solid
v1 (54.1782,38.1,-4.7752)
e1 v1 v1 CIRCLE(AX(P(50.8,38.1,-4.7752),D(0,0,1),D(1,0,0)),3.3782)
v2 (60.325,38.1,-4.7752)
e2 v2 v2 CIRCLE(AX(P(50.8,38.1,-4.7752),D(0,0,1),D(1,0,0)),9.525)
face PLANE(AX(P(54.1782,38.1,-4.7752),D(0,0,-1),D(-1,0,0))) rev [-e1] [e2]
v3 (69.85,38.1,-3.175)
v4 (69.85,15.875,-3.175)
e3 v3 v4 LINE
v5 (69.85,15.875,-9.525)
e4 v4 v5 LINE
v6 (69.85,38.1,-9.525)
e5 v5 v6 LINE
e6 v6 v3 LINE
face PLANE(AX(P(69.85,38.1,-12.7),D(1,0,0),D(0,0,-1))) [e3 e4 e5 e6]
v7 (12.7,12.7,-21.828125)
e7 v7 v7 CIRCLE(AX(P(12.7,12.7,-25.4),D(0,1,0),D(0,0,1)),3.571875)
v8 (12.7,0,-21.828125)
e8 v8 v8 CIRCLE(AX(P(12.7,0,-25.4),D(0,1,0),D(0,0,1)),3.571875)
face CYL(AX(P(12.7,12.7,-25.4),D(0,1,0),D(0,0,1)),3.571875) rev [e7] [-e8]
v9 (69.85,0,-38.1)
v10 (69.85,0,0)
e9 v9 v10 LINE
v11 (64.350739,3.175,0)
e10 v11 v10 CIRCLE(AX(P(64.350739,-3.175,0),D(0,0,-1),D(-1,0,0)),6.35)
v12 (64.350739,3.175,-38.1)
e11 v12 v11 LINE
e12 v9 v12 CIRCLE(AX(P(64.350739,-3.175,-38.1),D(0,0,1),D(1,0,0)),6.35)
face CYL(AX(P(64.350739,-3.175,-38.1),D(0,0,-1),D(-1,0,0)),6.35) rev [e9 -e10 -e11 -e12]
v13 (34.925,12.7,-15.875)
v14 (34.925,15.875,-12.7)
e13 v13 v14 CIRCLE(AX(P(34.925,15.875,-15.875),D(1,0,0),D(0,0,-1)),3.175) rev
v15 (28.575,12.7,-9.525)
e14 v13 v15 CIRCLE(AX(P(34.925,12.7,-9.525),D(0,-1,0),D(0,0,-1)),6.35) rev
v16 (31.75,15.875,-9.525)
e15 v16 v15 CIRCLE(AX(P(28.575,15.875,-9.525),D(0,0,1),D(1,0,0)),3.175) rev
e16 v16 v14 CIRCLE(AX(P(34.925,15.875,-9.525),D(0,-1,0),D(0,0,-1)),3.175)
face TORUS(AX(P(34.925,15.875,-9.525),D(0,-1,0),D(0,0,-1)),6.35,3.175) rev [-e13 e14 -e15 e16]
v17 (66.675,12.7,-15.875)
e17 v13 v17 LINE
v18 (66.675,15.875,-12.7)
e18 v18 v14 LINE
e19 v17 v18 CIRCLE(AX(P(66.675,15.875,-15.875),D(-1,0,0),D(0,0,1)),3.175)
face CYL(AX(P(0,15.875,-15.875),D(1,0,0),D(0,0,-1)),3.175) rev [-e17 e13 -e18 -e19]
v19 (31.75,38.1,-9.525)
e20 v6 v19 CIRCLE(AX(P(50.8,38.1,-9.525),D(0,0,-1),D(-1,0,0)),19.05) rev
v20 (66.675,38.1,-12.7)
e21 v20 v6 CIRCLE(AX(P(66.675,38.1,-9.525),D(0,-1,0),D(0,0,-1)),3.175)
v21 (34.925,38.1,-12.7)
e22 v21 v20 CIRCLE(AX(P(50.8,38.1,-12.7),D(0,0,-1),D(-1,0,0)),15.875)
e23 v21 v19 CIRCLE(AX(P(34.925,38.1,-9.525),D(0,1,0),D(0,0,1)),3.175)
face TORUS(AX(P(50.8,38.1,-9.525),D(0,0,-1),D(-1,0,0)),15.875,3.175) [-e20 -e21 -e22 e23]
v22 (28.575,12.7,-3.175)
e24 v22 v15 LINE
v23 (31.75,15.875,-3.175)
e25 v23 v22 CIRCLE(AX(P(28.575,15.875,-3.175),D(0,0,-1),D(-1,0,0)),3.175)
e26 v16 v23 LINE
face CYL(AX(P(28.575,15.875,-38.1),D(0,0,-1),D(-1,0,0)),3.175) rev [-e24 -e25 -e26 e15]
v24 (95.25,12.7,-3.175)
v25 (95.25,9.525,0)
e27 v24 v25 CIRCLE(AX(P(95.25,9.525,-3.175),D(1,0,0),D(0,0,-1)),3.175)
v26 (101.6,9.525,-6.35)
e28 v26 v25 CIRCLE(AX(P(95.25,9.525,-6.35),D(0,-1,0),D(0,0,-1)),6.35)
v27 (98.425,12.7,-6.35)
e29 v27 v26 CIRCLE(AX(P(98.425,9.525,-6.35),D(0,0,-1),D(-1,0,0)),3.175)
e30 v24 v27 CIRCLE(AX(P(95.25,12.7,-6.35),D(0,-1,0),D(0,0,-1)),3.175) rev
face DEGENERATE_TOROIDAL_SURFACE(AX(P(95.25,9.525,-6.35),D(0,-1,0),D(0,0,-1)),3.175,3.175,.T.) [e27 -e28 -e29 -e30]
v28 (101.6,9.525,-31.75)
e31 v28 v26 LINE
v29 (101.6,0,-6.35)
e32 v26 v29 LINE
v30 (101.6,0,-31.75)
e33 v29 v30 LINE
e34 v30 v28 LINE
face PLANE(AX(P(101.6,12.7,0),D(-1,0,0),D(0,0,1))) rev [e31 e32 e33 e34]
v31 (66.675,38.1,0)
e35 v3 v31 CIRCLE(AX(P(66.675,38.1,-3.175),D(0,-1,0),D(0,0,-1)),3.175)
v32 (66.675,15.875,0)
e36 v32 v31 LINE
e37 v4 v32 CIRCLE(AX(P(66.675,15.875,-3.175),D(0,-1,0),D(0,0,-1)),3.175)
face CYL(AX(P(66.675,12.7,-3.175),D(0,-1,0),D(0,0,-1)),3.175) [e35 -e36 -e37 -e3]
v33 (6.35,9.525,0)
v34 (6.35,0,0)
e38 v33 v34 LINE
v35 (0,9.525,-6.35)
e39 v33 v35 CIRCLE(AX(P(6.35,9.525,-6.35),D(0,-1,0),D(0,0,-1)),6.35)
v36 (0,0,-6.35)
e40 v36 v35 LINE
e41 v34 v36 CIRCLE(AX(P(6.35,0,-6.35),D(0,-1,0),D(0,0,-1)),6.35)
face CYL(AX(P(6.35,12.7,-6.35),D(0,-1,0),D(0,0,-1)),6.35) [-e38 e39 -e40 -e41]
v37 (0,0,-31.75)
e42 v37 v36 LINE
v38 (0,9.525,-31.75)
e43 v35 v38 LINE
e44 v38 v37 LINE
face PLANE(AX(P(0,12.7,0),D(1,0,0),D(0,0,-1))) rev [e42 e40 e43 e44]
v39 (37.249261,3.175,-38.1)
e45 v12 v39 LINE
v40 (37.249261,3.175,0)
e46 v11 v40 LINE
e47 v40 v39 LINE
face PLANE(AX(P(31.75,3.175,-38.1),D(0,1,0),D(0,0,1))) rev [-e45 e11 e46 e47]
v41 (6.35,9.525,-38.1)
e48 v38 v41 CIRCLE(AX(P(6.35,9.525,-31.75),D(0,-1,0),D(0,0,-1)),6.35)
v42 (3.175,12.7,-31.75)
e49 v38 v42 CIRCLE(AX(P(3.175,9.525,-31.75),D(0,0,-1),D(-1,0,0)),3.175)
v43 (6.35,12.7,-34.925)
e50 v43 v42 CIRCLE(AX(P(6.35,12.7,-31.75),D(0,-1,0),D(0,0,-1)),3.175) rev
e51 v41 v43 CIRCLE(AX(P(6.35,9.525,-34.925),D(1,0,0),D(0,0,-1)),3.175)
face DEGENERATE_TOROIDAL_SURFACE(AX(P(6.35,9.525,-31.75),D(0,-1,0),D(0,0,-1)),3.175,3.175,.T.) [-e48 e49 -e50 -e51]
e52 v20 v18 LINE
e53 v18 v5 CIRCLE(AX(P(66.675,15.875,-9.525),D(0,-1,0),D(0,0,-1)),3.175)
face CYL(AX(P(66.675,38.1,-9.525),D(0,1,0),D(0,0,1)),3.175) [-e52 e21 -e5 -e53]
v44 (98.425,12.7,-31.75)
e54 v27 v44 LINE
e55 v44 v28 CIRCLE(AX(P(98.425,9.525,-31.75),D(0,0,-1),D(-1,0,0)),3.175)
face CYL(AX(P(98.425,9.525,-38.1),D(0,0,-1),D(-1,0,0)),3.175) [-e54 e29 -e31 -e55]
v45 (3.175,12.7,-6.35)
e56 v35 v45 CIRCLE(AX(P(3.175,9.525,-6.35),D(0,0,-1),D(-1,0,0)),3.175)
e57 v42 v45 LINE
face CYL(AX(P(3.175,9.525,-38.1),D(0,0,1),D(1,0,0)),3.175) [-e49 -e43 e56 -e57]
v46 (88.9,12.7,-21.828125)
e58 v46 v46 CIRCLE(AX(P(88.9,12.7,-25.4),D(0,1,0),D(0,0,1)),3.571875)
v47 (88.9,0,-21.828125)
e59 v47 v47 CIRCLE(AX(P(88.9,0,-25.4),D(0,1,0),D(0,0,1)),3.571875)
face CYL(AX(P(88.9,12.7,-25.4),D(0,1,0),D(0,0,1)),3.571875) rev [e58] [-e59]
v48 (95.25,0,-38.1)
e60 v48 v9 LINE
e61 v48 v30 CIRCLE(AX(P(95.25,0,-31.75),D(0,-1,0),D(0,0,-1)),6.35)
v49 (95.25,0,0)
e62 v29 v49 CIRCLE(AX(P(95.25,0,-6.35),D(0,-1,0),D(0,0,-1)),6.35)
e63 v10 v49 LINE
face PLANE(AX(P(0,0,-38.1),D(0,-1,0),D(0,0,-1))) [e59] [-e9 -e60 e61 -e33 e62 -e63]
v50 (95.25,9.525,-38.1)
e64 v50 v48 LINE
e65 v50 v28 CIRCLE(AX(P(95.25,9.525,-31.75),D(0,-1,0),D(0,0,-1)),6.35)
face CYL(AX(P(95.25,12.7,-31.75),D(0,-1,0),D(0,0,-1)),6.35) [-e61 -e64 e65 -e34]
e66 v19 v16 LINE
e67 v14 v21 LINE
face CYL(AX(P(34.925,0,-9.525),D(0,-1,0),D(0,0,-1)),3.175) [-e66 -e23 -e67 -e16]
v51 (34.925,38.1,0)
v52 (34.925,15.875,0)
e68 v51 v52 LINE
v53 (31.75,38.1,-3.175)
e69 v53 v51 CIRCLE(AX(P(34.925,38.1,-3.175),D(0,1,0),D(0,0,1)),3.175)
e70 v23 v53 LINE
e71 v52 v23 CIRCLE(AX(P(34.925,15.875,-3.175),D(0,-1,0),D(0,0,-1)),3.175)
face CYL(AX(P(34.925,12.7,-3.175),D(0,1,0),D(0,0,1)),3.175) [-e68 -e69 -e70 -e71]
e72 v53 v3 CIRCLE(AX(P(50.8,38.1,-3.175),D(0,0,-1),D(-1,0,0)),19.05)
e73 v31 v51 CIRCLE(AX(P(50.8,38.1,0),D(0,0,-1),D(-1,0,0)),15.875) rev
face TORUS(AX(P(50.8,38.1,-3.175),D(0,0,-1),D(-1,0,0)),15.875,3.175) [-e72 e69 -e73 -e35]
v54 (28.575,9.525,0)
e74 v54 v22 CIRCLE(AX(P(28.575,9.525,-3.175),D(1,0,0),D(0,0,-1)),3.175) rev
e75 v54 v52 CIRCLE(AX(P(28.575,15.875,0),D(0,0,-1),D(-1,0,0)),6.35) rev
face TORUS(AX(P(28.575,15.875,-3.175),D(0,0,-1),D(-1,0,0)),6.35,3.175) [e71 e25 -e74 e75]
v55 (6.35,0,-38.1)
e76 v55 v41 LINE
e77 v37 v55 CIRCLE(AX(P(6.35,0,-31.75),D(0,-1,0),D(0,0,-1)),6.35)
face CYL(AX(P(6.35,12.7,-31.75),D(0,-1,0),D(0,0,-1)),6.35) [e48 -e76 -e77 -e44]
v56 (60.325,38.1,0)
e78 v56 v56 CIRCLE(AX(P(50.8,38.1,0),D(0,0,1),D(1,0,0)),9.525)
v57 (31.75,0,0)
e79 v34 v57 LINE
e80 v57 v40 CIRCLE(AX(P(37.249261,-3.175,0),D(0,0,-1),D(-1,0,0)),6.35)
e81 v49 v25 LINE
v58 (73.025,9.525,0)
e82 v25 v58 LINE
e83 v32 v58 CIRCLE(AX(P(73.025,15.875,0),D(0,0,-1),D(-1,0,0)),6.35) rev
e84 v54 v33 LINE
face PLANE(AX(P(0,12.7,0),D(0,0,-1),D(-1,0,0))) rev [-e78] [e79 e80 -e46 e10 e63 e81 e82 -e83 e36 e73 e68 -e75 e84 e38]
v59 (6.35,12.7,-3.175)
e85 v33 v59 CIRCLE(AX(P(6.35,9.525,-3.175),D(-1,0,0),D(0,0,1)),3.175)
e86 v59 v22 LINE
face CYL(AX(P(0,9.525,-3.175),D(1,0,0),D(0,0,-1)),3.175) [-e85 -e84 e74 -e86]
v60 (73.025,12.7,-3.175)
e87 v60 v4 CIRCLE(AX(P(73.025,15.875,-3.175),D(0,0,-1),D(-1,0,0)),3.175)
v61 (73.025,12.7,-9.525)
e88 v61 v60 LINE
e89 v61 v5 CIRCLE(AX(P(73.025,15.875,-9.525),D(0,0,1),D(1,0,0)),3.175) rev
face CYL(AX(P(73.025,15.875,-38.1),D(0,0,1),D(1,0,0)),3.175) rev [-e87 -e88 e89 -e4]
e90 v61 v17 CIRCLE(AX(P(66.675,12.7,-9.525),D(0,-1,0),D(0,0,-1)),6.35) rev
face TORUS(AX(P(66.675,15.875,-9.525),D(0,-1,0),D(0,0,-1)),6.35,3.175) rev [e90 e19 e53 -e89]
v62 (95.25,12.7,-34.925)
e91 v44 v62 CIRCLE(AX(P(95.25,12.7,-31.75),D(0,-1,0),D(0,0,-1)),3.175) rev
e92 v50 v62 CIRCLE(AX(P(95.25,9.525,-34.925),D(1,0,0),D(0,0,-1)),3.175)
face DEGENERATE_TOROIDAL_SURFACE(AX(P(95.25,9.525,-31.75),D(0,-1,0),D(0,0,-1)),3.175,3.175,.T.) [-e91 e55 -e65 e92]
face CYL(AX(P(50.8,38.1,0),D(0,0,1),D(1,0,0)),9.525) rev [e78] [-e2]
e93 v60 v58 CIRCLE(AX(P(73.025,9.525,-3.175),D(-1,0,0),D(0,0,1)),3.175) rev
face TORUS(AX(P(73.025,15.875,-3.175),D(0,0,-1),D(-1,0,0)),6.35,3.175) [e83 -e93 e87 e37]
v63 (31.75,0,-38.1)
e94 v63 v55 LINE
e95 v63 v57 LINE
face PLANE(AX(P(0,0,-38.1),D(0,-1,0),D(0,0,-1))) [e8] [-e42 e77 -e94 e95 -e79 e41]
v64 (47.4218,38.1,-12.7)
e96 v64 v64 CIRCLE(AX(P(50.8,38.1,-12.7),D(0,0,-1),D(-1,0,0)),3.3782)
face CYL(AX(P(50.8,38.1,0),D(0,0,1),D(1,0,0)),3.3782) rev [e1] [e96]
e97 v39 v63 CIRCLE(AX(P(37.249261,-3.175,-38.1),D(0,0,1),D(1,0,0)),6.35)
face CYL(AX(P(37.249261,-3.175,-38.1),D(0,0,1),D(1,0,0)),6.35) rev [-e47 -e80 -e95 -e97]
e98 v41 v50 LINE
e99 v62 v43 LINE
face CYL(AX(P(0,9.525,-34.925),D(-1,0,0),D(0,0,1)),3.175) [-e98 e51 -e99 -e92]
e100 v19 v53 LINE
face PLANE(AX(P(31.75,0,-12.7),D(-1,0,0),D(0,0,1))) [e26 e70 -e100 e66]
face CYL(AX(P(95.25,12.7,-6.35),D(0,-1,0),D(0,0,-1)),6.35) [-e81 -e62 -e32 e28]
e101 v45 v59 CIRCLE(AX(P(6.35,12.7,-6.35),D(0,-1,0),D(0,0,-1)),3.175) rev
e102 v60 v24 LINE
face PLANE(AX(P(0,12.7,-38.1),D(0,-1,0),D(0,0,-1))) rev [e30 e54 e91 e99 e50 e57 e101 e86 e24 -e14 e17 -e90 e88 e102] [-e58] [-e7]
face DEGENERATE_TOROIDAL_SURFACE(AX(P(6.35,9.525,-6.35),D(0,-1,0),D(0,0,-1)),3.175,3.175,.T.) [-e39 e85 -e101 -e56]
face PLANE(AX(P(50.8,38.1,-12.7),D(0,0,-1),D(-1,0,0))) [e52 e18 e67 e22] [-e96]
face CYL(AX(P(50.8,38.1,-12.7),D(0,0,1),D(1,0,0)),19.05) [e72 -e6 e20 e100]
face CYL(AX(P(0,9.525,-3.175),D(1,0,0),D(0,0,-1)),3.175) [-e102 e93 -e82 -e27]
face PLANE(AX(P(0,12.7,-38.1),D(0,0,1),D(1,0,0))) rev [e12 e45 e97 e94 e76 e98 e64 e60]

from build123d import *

# Parameters (mm, degrees)
SKETCH1_W                                = 101.6
SKETCH1_H                                = 38.1
BASE_EXTRUDE_DEPTH                       = 12.7
BOSS_EXTRUDE1_DEPTH                      = 12.7
CBORE_FOR_1_4_HEX_HEAD_BOLT1_D           = 6.7564
CBORE_FOR_1_4_HEX_HEAD_BOLT1_CBORE_D     = 19.05
CBORE_FOR_1_4_HEX_HEAD_BOLT1_CBORE_DEPTH = 4.7752
SKETCH10_W                               = 38.1
SKETCH10_H                               = 3.175
CUT_EXTRUDE1_DEPTH                       = 123.994494021
F_9_32_0_28125_DIAMETER_HOLE1_D          = 7.14375
FILLET1_R                                = 6.35
FILLET2_R                                = 3.175


with BuildPart() as part:
    # Sketch1 → Base-Extrude (new body)
    with BuildSketch(Plane(origin=(0, 0, 0), x_dir=(1, 0, 0), z_dir=(0, 1, 0))):
        with Locations((50.8, 19.05)):
            Rectangle(SKETCH1_W, SKETCH1_H)
    extrude(amount=BASE_EXTRUDE_DEPTH)

    # Sketch2 → Boss-Extrude1 (add)
    with BuildSketch(Plane.XY):
        with BuildLine():
            Line((31.75, 0), (31.75, 38.1))
            ThreePointArc((31.75, 38.1), (50.8, 57.15), (69.85, 38.1))
            Line((69.85, 38.1), (69.85, 0))
            Line((69.85, 0), (31.75, 0))
        make_face()
    extrude(amount=-BOSS_EXTRUDE1_DEPTH)

    # CBORE for 1/4 Hex Head Bolt1 (through all)
    with Locations(Plane(origin=(1.103556277, -5.640959644, 0), x_dir=(1, 0, 0), z_dir=(0, 0, 1))):
        with Locations((49.696443723, 43.740959644)):
            CounterBoreHole(CBORE_FOR_1_4_HEX_HEAD_BOLT1_D / 2, CBORE_FOR_1_4_HEX_HEAD_BOLT1_CBORE_D / 2, CBORE_FOR_1_4_HEX_HEAD_BOLT1_CBORE_DEPTH)

    # Sketch10 → Cut-Extrude1 (cut, through all)
    with BuildSketch(Plane(origin=(-1.071270925, 1.162093394, 0), x_dir=(1, 0, 0), z_dir=(0, 0, 1))):
        with Locations((51.871270925, 0.425406606)):
            Rectangle(SKETCH10_W, SKETCH10_H)
    extrude(amount=-CUT_EXTRUDE1_DEPTH, mode=Mode.SUBTRACT)

    # 9/32 (0.28125) Diameter Hole1 (through all)
    with Locations(Plane(origin=(45.908148148, 12.7, 7.855185185), x_dir=(-1, 0, 0), z_dir=(0, 1, 0))):
        with Locations((-42.991851852, -33.255185185), (33.208148148, -33.255185185)):
            Hole(F_9_32_0_28125_DIAMETER_HOLE1_D / 2)

    # Fillet1
    # the kernel refuses this fillet: 6.35 mm, written as the material it adds along each edge
    with BuildSketch(Plane(origin=(31.75, 3.175, 0), x_dir=(0, -1, 0), z_dir=(0, 0, -1))) as fillet1_piece_1:
        with BuildLine():
            CenterArc((6.35, -5.499261314), FILLET1_R, 120, 60)
            Line((0, -5.499261314), (0, 0))
            Line((0, 0), (3.175, 0))
        make_face()
    extrude(amount=38.1)
    with BuildSketch(Plane(origin=(69.85, 3.175, 0), x_dir=(-1, 0, 0), z_dir=(0, 0, -1))) as fillet1_piece_2:
        with BuildLine():
            CenterArc((5.499261314, -6.35), FILLET1_R, 90, 60)
            Line((0, -3.175), (0, 0))
            Line((0, 0), (5.499261314, 0))
        make_face()
    extrude(amount=38.1)
    # the kernel refuses this fillet: 6.35 mm, written as the material it takes off along each edge
    with BuildSketch(Plane(origin=(0, -15.875, -38.1), x_dir=(0, 0, 1), z_dir=(0, 1, 0)), Plane(origin=(0, -15.875, 0), x_dir=(1, 0, 0), z_dir=(0, 1, 0))) as fillet1_2_piece_1:
        with BuildLine():
            CenterArc((FILLET1_R, FILLET1_R), FILLET1_R, 180, 90)
            Line((0, FILLET1_R), (0, 0))
            Line((0, 0), (FILLET1_R, 0))
        make_face()
    extrude(amount=44.45, mode=Mode.SUBTRACT)
    with BuildSketch(Plane(origin=(101.6, -15.875, -38.1), x_dir=(0, 0, 1), z_dir=(0, 1, 0)), Plane(origin=(101.6, -15.875, 0), x_dir=(-1, 0, 0), z_dir=(0, 1, 0))) as fillet1_2_piece_2:
        with BuildLine():
            CenterArc((FILLET1_R, -FILLET1_R), FILLET1_R, 90, 90)
            Line((0, -FILLET1_R), (0, 0))
            Line((0, 0), (FILLET1_R, 0))
        make_face()
    extrude(amount=44.45, mode=Mode.SUBTRACT)

    # Fillet2
    fillet2_edges = [part.edges().sort_by_distance(p)[0] for p in [
        (82.55, 12.7, 0),
        (31.75, 25.4, -12.7),
        (69.85, 25.4, -12.7),
        (31.75, 25.4, 0),
        (69.85, 25.4, 0),
        (50.8, 57.15, 0),
        (31.75, 12.7, -6.35),
        (50.8, 57.15, -12.7),
        (69.85, 12.7, -6.35),
        (50.8, 12.7, -12.7),
        (19.05, 12.7, 0),
        (0, 12.7, -19.05),
        (101.6, 12.7, -19.05),
        (50.8, 12.7, -38.1),
        (1.859871939, 12.7, -36.240128061),
        (99.740128061, 12.7, -36.240128061),
        (99.740128061, 12.7, -1.859871939),
        (1.859871939, 12.7, -1.859871939),
    ]]
    fillet(fillet2_edges, radius=FILLET2_R)


solid = part.part
